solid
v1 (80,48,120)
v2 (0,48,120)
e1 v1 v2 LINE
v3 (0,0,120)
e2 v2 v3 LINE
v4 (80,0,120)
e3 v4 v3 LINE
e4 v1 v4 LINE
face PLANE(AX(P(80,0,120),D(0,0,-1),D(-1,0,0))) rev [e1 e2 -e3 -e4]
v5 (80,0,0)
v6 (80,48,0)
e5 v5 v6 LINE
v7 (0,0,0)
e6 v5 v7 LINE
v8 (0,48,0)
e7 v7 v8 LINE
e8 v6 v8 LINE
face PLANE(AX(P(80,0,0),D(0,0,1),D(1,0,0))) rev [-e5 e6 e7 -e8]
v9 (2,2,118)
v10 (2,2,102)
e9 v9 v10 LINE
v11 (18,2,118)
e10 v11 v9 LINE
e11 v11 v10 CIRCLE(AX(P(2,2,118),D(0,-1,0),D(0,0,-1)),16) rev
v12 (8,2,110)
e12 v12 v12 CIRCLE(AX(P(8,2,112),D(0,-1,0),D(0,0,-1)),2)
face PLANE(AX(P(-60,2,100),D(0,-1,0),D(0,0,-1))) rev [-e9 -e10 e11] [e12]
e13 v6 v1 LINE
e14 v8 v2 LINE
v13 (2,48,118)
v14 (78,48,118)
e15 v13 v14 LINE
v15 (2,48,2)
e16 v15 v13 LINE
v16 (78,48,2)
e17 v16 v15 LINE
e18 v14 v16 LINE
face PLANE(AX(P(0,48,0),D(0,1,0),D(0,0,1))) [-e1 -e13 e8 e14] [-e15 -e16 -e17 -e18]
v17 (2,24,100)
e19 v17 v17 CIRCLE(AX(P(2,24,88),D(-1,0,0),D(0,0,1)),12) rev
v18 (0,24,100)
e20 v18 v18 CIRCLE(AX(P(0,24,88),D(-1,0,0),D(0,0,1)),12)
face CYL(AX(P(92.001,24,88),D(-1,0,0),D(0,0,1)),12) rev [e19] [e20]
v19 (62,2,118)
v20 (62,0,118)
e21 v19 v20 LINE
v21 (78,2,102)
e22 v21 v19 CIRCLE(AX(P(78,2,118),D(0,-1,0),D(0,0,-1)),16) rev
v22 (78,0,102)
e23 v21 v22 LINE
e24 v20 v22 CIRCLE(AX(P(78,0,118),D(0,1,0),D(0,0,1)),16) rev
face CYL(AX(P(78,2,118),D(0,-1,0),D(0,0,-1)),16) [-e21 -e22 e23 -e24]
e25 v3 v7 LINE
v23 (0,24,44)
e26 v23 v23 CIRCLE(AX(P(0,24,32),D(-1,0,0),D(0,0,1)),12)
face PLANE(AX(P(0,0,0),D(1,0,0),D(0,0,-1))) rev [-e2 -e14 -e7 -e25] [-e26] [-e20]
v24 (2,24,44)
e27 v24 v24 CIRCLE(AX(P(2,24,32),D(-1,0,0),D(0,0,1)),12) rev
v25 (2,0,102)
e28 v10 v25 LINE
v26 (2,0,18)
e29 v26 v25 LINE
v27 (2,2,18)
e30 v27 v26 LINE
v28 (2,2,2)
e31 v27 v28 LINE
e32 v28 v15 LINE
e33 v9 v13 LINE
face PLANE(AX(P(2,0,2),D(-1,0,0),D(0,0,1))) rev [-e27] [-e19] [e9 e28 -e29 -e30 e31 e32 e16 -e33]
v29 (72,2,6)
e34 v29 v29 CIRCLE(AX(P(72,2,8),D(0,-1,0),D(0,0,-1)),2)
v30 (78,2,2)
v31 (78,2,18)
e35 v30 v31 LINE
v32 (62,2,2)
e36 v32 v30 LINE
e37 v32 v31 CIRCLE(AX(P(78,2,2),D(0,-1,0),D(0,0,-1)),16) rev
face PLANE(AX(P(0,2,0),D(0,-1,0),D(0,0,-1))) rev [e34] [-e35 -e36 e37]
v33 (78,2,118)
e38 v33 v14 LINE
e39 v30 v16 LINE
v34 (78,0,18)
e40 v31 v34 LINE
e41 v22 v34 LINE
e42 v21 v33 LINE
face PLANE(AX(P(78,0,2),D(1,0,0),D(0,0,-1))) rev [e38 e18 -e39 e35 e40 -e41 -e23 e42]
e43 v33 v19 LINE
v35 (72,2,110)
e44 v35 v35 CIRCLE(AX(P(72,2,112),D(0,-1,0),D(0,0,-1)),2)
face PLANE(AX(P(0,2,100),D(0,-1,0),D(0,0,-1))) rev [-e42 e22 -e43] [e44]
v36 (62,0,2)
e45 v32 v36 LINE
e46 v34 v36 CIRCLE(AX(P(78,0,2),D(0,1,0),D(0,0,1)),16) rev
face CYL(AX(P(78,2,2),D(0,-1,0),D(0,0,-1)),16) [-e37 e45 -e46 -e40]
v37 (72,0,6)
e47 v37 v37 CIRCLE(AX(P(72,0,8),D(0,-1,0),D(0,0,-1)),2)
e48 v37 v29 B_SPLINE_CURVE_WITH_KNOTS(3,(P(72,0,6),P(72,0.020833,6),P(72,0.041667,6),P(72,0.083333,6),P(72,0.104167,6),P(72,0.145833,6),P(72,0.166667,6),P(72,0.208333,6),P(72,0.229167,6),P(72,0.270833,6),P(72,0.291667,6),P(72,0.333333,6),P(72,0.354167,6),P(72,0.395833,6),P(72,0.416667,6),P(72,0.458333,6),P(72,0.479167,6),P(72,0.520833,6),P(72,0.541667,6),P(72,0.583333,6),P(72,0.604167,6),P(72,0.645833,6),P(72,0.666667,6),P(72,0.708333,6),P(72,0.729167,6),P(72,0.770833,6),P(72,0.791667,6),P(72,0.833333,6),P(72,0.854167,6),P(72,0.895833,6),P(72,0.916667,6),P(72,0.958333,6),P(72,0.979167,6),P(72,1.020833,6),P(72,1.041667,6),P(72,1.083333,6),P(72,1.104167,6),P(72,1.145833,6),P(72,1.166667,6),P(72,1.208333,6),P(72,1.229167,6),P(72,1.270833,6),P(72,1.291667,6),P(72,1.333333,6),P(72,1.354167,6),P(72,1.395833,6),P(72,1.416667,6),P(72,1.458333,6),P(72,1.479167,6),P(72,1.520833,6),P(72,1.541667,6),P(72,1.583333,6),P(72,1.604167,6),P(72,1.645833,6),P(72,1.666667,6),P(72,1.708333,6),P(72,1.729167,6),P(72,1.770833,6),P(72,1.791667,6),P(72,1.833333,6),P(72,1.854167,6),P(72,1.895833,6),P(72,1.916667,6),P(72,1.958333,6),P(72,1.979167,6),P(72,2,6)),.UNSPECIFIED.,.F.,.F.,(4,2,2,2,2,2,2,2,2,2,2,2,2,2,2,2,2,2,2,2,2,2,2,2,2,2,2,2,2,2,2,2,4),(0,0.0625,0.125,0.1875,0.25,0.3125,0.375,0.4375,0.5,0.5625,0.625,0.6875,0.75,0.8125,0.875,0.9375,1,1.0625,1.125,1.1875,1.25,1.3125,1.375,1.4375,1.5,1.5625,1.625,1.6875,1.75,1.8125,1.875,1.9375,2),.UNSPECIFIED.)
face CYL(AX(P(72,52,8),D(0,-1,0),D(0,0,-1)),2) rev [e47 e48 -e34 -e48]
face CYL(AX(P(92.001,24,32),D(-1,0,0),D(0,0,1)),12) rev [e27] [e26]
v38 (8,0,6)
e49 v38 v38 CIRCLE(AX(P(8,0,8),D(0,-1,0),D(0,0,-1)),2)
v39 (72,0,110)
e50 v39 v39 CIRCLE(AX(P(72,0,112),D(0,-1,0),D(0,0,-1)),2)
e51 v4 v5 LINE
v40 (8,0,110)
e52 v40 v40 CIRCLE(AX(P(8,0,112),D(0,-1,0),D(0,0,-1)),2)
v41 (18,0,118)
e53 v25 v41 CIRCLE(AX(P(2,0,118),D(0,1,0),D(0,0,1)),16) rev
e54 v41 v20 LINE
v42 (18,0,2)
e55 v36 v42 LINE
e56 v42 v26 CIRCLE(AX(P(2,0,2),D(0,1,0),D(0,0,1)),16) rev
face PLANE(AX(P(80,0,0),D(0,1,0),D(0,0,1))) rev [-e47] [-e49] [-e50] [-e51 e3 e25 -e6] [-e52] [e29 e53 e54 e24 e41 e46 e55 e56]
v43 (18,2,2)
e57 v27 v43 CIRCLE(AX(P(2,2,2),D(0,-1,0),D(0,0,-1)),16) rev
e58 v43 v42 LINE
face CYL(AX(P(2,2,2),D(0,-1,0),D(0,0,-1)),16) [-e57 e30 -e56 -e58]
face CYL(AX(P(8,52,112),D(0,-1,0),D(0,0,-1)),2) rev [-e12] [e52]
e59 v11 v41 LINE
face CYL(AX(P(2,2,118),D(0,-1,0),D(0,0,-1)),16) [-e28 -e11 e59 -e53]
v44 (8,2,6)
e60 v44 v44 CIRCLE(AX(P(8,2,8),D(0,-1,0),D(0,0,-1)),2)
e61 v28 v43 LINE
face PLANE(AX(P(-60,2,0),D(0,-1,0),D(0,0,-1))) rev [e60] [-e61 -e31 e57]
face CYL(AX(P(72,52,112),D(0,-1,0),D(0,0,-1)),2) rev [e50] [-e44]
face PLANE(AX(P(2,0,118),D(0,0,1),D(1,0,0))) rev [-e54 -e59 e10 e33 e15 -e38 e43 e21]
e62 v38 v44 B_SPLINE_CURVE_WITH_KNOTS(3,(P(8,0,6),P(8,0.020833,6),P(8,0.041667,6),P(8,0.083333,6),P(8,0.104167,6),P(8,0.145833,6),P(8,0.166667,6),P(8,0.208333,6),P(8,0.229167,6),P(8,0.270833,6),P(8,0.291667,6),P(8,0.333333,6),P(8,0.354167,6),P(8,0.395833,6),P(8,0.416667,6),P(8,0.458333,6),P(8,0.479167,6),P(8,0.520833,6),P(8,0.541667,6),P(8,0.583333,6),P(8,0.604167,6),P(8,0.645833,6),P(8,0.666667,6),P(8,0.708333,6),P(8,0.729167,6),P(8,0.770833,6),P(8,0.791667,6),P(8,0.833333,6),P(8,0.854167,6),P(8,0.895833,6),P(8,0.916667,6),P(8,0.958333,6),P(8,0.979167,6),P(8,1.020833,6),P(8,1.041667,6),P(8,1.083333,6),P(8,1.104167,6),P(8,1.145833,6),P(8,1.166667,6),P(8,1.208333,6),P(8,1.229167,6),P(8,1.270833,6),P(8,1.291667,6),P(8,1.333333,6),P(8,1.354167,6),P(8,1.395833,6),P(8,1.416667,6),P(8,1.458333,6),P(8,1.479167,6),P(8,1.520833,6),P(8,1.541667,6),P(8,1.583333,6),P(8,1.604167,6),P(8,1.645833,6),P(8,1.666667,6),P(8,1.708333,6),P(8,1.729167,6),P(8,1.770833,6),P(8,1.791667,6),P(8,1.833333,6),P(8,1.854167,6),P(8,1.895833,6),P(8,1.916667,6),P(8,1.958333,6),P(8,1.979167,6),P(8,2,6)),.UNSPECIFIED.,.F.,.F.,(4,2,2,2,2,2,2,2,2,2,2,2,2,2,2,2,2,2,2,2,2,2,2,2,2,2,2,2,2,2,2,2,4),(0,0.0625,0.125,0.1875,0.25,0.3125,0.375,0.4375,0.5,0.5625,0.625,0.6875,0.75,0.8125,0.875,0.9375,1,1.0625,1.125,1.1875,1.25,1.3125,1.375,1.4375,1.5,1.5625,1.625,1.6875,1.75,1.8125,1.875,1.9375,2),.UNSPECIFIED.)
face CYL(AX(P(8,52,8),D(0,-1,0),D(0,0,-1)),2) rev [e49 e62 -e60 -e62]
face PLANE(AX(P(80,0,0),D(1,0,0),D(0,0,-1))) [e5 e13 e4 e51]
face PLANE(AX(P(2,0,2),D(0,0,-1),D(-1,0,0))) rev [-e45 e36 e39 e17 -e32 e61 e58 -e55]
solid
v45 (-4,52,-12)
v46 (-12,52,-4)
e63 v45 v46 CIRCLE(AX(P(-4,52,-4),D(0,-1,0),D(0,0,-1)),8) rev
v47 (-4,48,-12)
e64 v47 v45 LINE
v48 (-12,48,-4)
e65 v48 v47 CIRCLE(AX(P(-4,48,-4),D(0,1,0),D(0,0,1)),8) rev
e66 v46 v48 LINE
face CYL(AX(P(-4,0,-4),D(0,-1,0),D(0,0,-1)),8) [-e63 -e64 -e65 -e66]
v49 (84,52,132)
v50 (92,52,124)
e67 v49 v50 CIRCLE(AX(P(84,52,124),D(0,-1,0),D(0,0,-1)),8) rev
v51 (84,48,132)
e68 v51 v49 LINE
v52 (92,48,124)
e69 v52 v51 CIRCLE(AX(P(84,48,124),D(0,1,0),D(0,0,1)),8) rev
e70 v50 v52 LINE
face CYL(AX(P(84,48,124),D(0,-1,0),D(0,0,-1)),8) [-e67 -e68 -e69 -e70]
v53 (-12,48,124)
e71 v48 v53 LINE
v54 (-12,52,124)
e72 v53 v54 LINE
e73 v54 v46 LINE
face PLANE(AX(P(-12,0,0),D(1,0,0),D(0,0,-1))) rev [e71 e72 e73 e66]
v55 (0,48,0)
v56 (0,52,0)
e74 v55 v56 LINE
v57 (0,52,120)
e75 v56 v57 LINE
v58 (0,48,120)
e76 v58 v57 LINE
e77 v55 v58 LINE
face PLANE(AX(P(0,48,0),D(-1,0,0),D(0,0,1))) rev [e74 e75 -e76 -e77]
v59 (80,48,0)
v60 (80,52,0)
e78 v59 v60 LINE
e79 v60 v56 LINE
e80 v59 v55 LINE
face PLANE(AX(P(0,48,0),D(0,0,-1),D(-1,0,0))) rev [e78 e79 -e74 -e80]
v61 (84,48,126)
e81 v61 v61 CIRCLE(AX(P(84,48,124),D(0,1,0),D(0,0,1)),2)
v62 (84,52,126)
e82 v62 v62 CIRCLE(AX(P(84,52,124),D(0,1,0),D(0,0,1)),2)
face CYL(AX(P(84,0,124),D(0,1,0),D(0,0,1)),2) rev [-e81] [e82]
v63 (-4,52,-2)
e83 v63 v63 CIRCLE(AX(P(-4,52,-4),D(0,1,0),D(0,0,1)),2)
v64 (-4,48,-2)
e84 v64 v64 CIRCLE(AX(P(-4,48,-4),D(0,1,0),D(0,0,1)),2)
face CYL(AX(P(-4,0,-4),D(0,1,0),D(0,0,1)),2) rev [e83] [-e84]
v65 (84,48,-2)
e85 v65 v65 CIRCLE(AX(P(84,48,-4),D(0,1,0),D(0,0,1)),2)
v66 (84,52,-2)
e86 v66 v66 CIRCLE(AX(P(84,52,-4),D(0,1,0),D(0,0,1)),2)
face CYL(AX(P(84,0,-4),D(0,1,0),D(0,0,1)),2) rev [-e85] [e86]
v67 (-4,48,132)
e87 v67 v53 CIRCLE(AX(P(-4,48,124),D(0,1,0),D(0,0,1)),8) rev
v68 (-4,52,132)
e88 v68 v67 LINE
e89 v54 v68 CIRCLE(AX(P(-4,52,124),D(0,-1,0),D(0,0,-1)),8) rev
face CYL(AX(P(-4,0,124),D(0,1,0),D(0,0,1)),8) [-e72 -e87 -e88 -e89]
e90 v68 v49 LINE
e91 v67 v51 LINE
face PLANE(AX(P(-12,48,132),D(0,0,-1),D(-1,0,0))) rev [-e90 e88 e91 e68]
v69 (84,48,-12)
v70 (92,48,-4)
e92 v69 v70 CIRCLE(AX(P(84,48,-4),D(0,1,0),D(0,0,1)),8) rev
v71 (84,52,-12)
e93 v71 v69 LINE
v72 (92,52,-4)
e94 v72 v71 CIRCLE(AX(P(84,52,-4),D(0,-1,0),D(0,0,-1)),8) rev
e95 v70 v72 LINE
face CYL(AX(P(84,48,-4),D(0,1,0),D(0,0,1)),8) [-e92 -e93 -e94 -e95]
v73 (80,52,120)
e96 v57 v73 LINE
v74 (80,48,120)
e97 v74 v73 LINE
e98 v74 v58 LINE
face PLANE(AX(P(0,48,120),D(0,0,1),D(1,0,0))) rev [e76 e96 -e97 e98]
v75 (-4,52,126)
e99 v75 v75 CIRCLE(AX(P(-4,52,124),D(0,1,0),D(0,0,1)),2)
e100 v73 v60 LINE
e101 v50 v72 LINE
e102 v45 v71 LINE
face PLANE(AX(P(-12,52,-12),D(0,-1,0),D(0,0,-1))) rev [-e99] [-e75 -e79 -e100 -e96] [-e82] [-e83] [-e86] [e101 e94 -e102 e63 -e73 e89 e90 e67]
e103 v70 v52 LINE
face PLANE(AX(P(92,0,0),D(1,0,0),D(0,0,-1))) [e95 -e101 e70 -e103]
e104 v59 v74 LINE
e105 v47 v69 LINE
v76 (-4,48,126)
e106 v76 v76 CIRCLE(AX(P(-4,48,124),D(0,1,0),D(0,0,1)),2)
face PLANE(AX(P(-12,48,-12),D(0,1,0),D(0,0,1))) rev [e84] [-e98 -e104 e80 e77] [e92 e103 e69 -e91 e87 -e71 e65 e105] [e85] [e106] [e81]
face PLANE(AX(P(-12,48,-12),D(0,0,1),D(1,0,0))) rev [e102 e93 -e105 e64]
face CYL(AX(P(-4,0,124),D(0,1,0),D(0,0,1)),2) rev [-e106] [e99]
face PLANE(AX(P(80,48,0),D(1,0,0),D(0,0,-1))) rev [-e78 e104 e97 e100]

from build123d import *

# Parameters (mm, degrees)
SIDE_VIEW_LARGE_RECT_W       = 120
SIDE_VIEW_LARGE_RECT_H       = 48
SALIENTE_EXTRUIR1_DEPTH      = 80
SALIENTE_EXTRUIR2_DEPTH      = 52
SALIENTE_EXTRUIR2_DEPTH_BACK = 52
CROQUIS4_W                   = 144
CROQUIS4_H                   = 4
CROQUIS6_W                   = 80
CROQUIS6_H                   = 120
CORTAR_EXTRUIR2_DEPTH        = 4
CROQUIS7_W                   = 76
CROQUIS7_H                   = 116
CORTAR_EXTRUIR3_DEPTH        = 168.904734895
CROQUIS8_W                   = 16
CROQUIS8_H                   = 16
SALIENTE_EXTRUIR3_DEPTH      = 2
MATRIZL1_COUNT               = 2
MATRIZL1_PITCH               = 60
MATRIZL1_COUNT_DIR2          = 2
MATRIZL1_PITCH_DIR2          = 100
REDONDEO1_R                  = 16
REDONDEO2_R                  = 16
REDONDEO3_R                  = 16
REDONDEO4_R                  = 16
REDONDEO5_R                  = 8
CROQUIS10_R                  = 2
CORTAR_EXTRUIR4_DEPTH        = 170.091691103
MATRIZL2_COUNT               = 2
MATRIZL2_PITCH               = 88
MATRIZL2_COUNT_DIR2          = 2
MATRIZL2_PITCH_DIR2          = 128
CROQUIS11_R                  = 2
CORTAR_EXTRUIR5_DEPTH        = 170.091691103
MATRIZL4_COUNT               = 2
MATRIZL4_PITCH               = 64
MATRIZL4_COUNT_DIR2          = 2
MATRIZL4_PITCH_DIR2          = 104
CROQUIS12_R                  = 12
CORTAR_EXTRUIR6_DEPTH        = 2


with BuildPart() as part:
    # Side-view-large-rect → Saliente-Extruir1 (new body)
    with BuildSketch(Plane(origin=(0, 0, 0), x_dir=(0, 0, -1), z_dir=(1, 0, 0))):
        with Locations((-60, 24)):
            Rectangle(SIDE_VIEW_LARGE_RECT_W, SIDE_VIEW_LARGE_RECT_H)
    extrude(amount=SALIENTE_EXTRUIR1_DEPTH)

    # Croquis4 → Saliente-Extruir2 (add, two sides: drawn at the far end of the back side and taken through both)
    with BuildSketch(Plane.ZY.offset(-40).offset(-SALIENTE_EXTRUIR2_DEPTH_BACK)):
        with Locations((60, 50)):
            Rectangle(CROQUIS4_W, CROQUIS4_H)
    extrude(amount=SALIENTE_EXTRUIR2_DEPTH + SALIENTE_EXTRUIR2_DEPTH_BACK)

    # Croquis6 → Cortar-Extruir2 (cut)
    with BuildSketch(Plane(origin=(0, 52, 0), x_dir=(1, 0, 0), z_dir=(0, 1, 0))):
        with Locations((40, -60)):
            Rectangle(CROQUIS6_W, CROQUIS6_H)
    extrude(amount=-CORTAR_EXTRUIR2_DEPTH, mode=Mode.SUBTRACT)


with BuildPart() as cortar_extruir2_piece_1:
    # of the separate pieces the step leaves, piece 1, a body of its own (cortar_extruir2_pieces)
    add(part.part.solids().sort_by_distance((0, 0, 120))[0])

    # Croquis7 → Cortar-Extruir3 (cut, through all)
    with BuildSketch(Plane(origin=(0, 48, 0), x_dir=(1, 0, 0), z_dir=(0, 1, 0))):
        with Locations((40, -60)):
            Rectangle(CROQUIS7_W, CROQUIS7_H)
    extrude(amount=-CORTAR_EXTRUIR3_DEPTH, mode=Mode.SUBTRACT)

    # Croquis8 → Saliente-Extruir3 (add)
    with BuildSketch(Plane(origin=(0, 0, 0), x_dir=(-1, 0, 0), z_dir=(0, -1, 0))):
        with Locations((-70, -10)):
            Rectangle(CROQUIS8_W, CROQUIS8_H)
    saliente_extruir3 = extrude(amount=-SALIENTE_EXTRUIR3_DEPTH)

    # MatrizL1: Saliente-Extruir3 2 × 2
    with Locations(*[(-i * MATRIZL1_PITCH, 0, j * MATRIZL1_PITCH_DIR2) for i in range(MATRIZL1_COUNT) for j in range(MATRIZL1_COUNT_DIR2) if (i, j) != (0, 0)]):
        add(saliente_extruir3)

    # Redondeo1
    redondeo1_edges = [cortar_extruir2_piece_1.edges().sort_by_distance(p)[0] for p in [
        (62, 1, 18),
    ]]
    fillet(redondeo1_edges, radius=REDONDEO1_R - 0.0001)  # a hair under: the kernel refuses the full size

    # Redondeo2
    redondeo2_edges = [cortar_extruir2_piece_1.edges().sort_by_distance(p)[0] for p in [
        (18, 1, 18),
    ]]
    fillet(redondeo2_edges, radius=REDONDEO2_R - 0.0001)  # a hair under: the kernel refuses the full size

    # Redondeo3
    redondeo3_edges = [cortar_extruir2_piece_1.edges().sort_by_distance(p)[0] for p in [
        (18, 1, 102),
    ]]
    fillet(redondeo3_edges, radius=REDONDEO3_R - 0.0001)  # a hair under: the kernel refuses the full size

    # Redondeo4
    redondeo4_edges = [cortar_extruir2_piece_1.edges().sort_by_distance(p)[0] for p in [
        (62, 1, 102),
    ]]
    fillet(redondeo4_edges, radius=REDONDEO4_R - 0.0001)  # a hair under: the kernel refuses the full size

    # Croquis11 → Cortar-Extruir5 (cut, through all)
    with BuildSketch(Plane(origin=(0, 0, 0), x_dir=(-1, 0, 0), z_dir=(0, -1, 0))):
        with Locations(Location((-72, -8, 0), (0, 0, 90))):
            Circle(CROQUIS11_R)
    cortar_extruir5 = extrude(amount=-CORTAR_EXTRUIR5_DEPTH, mode=Mode.SUBTRACT)

    # MatrizL4: Cortar-Extruir5 2 × 2
    with Locations(*[(-i * MATRIZL4_PITCH, 0, j * MATRIZL4_PITCH_DIR2) for i in range(MATRIZL4_COUNT) for j in range(MATRIZL4_COUNT_DIR2) if (i, j) != (0, 0)]):
        add(cortar_extruir5, mode=Mode.SUBTRACT)

    # Croquis12 → Cortar-Extruir6 (cut)
    with BuildSketch(Plane.ZY):
        with Locations((32, 24)):
            Circle(CROQUIS12_R)
        with Locations((88, 24)):
            Circle(CROQUIS12_R)
    extrude(amount=-CORTAR_EXTRUIR6_DEPTH, mode=Mode.SUBTRACT)


with BuildPart() as cortar_extruir2_piece_2:
    # of the separate pieces the step leaves, piece 2, a body of its own (cortar_extruir2_pieces)
    add(part.part.solids().sort_by_distance((-12, 48, -12))[0])

    # Redondeo5
    redondeo5_edges = [cortar_extruir2_piece_2.edges().sort_by_distance(p)[0] for p in [
        (92, 50, -12),
        (92, 50, 132),
        (-12, 50, -12),
        (-12, 50, 132),
    ]]
    fillet(redondeo5_edges, radius=REDONDEO5_R)

    # Croquis10 → Cortar-Extruir4 (cut, through all)
    with BuildSketch(Plane(origin=(0, 52, 0), x_dir=(1, 0, 0), z_dir=(0, 1, 0))):
        with Locations(Location((-4, 4, 0), (0, 0, 270))):
            Circle(CROQUIS10_R)
    cortar_extruir4 = extrude(amount=-CORTAR_EXTRUIR4_DEPTH, mode=Mode.SUBTRACT)

    # MatrizL2: Cortar-Extruir4 2 × 2
    with Locations(*[(i * MATRIZL2_PITCH, 0, j * MATRIZL2_PITCH_DIR2) for i in range(MATRIZL2_COUNT) for j in range(MATRIZL2_COUNT_DIR2) if (i, j) != (0, 0)]):
        add(cortar_extruir4, mode=Mode.SUBTRACT)


solid = Compound([cortar_extruir2_piece_1.part, cortar_extruir2_piece_2.part])
